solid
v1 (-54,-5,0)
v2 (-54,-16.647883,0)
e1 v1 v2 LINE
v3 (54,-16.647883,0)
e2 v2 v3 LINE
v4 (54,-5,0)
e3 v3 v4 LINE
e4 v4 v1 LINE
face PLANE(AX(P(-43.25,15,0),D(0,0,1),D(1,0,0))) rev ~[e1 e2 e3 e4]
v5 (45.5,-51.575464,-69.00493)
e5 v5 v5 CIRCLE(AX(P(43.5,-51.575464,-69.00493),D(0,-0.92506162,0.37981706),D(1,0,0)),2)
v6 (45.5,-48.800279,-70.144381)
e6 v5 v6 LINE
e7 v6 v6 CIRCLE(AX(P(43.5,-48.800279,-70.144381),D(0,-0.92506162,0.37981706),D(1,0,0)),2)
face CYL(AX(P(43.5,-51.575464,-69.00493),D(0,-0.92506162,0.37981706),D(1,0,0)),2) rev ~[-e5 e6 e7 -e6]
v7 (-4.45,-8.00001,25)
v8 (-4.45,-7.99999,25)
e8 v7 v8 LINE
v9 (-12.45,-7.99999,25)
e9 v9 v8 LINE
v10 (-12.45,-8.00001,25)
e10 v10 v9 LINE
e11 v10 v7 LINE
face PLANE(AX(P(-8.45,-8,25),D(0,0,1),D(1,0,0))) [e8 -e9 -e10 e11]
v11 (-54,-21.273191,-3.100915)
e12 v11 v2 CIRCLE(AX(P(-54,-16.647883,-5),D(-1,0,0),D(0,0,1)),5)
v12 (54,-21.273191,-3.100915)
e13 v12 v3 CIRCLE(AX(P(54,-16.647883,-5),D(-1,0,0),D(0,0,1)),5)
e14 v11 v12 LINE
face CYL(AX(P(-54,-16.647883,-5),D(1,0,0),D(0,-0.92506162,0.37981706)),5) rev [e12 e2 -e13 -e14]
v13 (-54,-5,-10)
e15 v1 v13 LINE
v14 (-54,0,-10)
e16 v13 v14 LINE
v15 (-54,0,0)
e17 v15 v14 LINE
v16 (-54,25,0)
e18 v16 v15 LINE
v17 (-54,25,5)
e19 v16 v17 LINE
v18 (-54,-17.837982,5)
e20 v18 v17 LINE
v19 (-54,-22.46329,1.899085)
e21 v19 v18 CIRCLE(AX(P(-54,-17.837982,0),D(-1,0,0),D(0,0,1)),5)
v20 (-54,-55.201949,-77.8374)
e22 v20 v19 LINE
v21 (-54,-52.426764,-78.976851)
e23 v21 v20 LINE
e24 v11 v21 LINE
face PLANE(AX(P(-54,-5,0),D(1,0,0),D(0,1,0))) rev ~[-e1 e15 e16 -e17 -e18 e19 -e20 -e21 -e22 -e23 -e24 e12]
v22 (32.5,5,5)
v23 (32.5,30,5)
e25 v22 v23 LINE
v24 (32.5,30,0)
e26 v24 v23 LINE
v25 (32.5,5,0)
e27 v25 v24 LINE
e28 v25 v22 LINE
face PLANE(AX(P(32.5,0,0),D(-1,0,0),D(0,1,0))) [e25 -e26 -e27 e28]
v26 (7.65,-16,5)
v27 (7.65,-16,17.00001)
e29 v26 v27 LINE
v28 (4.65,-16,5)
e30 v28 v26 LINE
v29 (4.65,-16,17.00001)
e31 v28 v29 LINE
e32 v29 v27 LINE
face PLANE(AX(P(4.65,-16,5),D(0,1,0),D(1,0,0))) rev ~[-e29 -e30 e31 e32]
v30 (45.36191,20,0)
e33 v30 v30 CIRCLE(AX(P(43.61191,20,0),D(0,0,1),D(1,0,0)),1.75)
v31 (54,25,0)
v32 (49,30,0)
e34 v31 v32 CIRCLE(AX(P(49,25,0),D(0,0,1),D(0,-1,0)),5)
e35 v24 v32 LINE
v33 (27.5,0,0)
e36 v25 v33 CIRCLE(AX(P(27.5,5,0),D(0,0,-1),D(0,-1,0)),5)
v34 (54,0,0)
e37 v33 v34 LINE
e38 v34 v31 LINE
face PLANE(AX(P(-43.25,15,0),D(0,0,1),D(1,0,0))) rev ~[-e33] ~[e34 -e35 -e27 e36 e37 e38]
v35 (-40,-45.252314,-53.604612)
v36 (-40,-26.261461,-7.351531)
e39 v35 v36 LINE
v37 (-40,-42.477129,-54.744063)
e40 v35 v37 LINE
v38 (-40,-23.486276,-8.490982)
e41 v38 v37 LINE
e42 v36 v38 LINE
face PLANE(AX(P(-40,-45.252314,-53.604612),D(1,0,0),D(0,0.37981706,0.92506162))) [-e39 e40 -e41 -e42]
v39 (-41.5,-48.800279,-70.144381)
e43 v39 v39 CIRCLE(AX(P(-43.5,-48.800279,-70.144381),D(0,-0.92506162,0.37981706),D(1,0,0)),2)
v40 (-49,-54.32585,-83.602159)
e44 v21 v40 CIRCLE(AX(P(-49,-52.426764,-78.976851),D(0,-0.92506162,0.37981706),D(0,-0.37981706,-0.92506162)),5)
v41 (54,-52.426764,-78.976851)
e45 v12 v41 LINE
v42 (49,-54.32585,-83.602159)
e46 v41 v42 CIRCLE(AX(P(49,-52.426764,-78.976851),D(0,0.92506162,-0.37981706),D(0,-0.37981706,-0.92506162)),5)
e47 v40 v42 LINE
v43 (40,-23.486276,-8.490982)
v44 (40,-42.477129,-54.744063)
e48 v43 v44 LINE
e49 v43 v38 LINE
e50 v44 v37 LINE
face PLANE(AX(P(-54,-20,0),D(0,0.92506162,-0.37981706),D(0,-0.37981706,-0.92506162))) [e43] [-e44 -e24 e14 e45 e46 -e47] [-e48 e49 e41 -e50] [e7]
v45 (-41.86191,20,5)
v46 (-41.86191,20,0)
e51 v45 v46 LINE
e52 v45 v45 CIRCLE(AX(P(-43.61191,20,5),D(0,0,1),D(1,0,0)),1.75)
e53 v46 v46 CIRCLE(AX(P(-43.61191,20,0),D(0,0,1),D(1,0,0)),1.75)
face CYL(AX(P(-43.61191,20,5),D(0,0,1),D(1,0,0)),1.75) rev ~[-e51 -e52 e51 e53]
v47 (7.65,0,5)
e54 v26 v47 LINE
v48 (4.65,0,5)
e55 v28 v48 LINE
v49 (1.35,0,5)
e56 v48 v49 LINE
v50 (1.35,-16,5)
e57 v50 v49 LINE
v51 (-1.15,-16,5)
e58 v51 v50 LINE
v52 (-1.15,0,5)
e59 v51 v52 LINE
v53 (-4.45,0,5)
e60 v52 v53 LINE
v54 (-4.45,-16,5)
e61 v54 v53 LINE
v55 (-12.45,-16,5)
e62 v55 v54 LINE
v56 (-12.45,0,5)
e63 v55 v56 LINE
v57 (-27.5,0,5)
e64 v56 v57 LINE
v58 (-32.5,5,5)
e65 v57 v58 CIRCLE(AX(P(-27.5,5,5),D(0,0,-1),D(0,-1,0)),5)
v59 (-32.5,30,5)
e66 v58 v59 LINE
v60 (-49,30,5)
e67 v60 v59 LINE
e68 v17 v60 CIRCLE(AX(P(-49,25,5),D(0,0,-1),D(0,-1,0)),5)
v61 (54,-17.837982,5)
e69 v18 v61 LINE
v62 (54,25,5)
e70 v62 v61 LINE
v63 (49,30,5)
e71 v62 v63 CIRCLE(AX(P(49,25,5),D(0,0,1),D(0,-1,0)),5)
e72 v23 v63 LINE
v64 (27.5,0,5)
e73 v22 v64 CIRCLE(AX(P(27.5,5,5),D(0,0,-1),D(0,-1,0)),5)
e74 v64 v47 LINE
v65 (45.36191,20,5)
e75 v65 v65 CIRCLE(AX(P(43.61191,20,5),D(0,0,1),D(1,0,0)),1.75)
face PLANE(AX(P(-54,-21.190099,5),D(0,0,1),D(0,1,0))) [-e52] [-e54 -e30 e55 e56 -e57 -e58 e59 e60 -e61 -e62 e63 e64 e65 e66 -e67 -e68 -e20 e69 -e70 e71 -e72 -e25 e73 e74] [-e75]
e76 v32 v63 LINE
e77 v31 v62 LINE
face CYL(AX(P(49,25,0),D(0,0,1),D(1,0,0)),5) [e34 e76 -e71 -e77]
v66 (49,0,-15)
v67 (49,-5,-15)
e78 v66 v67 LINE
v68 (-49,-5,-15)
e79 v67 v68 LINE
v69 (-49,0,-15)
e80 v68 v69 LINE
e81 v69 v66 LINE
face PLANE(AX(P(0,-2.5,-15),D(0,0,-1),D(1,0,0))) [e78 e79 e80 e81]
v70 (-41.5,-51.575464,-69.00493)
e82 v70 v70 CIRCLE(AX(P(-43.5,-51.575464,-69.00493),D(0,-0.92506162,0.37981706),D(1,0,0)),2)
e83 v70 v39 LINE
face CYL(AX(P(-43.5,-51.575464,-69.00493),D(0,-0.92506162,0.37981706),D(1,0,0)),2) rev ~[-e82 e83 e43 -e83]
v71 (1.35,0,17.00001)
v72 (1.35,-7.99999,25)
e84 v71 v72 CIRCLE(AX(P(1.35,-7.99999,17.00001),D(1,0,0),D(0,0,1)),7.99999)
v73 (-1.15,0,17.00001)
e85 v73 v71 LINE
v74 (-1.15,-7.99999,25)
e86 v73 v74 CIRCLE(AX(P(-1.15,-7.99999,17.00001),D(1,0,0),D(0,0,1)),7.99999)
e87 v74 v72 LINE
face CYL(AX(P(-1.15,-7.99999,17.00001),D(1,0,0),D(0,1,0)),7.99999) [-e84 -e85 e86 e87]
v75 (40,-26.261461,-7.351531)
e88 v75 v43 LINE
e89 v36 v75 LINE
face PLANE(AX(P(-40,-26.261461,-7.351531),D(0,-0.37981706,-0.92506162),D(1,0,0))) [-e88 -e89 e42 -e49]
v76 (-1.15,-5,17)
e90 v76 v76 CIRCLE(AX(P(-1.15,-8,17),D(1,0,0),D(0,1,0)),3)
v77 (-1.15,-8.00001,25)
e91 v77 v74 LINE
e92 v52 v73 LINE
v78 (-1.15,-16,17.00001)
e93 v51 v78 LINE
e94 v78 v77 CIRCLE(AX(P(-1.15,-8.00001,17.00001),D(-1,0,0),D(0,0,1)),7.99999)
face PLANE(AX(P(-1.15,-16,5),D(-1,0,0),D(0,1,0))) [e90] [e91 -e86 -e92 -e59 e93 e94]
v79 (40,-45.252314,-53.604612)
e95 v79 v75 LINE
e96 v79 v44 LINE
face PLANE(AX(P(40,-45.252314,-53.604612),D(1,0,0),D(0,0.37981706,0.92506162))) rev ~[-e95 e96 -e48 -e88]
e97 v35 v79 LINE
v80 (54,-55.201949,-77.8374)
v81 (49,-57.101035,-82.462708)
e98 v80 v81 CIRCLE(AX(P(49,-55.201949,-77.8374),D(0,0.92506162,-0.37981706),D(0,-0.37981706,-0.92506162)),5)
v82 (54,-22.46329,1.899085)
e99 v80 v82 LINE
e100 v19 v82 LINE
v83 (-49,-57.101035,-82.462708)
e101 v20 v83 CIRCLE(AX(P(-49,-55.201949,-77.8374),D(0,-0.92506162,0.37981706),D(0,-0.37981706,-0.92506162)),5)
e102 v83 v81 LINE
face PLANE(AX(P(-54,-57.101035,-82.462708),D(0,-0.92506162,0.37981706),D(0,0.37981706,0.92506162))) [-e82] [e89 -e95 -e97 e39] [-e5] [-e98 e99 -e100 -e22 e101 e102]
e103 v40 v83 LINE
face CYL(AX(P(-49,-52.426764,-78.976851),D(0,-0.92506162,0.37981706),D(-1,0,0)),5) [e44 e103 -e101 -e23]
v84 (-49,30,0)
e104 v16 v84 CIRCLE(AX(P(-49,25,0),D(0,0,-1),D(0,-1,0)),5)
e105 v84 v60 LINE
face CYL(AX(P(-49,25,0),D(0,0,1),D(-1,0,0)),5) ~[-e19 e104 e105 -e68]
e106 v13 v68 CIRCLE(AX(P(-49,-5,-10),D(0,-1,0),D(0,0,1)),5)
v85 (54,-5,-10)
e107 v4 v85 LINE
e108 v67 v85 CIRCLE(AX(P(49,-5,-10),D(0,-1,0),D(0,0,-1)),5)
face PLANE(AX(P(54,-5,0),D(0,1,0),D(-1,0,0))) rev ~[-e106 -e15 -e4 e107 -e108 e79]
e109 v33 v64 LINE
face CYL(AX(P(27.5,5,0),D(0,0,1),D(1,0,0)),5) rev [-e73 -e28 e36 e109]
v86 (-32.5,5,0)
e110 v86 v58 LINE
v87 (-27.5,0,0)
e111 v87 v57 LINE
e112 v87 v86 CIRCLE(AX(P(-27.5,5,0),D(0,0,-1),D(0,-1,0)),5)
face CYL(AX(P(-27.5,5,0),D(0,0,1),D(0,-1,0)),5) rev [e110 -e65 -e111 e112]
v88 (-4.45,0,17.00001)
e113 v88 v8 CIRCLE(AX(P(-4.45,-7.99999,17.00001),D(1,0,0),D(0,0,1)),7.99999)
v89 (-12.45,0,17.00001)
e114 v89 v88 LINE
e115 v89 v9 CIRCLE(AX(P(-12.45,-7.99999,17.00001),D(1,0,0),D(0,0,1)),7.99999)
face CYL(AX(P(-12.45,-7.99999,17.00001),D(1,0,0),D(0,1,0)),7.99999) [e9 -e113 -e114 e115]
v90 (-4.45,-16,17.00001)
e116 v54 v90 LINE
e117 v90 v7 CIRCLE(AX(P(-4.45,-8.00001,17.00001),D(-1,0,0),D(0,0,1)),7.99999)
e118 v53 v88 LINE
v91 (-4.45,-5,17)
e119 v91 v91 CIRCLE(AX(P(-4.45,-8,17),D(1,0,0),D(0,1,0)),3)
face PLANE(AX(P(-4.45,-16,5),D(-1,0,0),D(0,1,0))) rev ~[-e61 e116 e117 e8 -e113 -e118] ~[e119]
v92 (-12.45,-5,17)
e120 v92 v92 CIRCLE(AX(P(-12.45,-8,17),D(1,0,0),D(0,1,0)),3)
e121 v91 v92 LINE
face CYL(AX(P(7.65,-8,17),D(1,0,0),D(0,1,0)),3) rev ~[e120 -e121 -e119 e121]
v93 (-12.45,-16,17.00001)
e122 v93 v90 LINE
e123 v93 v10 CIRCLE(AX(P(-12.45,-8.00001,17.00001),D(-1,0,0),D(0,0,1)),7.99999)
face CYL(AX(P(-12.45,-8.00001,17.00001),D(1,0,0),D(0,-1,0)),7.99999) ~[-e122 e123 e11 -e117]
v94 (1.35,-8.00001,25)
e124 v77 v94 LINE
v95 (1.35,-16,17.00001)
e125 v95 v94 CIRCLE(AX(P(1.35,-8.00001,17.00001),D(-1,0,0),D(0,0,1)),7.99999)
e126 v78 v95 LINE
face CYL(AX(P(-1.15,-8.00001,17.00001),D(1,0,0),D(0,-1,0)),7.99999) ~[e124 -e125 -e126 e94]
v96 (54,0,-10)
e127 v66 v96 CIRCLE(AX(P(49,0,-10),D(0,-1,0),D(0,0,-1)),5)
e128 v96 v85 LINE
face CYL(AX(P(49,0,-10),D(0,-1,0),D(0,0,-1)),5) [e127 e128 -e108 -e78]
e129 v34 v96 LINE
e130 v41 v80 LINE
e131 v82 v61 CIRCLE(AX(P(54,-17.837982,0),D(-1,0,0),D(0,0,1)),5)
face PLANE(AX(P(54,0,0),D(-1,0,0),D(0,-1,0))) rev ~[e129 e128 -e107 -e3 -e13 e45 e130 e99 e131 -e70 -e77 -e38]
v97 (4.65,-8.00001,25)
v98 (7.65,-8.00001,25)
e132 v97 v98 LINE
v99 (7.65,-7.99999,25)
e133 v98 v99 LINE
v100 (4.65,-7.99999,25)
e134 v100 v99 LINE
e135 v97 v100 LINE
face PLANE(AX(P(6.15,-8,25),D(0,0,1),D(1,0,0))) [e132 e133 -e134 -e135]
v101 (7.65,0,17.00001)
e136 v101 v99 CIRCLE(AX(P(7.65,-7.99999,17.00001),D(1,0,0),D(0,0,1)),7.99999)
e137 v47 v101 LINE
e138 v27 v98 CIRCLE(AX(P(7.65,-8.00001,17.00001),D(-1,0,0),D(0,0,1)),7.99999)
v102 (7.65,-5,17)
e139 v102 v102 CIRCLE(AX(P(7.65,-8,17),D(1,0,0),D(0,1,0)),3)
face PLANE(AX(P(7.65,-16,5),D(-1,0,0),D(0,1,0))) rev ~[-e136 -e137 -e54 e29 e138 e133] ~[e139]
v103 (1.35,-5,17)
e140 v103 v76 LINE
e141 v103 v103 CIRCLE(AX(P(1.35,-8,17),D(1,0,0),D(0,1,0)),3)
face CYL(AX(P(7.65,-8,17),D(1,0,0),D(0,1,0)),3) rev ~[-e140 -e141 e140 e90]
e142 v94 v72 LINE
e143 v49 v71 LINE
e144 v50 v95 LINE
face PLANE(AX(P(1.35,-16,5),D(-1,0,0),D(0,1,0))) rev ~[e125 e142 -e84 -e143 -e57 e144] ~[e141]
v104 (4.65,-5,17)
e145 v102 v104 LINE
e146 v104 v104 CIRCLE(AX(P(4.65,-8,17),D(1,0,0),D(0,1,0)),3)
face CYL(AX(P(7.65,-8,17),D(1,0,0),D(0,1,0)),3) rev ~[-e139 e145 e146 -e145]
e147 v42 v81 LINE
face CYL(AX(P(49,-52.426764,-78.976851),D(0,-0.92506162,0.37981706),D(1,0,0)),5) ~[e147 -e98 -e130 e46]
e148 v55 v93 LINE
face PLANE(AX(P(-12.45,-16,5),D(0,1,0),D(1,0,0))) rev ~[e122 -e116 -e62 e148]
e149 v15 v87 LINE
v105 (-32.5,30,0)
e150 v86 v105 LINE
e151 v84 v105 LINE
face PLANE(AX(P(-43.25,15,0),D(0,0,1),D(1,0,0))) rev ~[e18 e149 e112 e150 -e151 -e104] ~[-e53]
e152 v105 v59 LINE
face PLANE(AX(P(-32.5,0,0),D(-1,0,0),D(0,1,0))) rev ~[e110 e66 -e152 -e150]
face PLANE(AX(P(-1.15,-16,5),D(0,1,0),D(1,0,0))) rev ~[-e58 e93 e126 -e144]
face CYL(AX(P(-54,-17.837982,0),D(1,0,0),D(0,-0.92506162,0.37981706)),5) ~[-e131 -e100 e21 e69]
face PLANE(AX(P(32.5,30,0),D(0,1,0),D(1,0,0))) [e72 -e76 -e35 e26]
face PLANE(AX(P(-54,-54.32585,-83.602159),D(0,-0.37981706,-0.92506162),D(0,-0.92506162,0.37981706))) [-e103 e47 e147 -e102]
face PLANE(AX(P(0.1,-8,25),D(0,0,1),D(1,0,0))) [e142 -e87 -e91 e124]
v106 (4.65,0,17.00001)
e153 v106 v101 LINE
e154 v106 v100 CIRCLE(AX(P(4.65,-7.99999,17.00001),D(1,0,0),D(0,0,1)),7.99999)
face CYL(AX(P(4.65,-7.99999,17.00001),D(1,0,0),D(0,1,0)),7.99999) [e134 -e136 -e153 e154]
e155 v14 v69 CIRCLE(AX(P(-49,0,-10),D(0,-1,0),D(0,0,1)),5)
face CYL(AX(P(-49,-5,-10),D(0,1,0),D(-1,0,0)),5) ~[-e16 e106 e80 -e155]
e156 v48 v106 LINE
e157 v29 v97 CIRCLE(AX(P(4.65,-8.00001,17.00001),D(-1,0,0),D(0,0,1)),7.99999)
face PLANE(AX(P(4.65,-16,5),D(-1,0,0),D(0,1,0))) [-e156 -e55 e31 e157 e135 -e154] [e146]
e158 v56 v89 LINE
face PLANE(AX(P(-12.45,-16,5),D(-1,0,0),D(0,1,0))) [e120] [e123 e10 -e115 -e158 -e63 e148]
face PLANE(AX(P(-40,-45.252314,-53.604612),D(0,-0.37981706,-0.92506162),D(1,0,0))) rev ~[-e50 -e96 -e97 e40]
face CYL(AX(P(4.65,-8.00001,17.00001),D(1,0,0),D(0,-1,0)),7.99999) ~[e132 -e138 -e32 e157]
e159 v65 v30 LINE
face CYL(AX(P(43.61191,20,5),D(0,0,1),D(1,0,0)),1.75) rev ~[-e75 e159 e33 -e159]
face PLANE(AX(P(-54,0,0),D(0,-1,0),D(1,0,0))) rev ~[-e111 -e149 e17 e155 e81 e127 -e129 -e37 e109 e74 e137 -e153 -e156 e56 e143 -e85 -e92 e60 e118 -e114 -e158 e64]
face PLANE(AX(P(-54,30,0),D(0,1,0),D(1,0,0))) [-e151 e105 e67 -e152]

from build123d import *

# Parameters (mm, degrees)
F0_W      = 21.5
F0_H      = 30
F1_DEPTH  = 5
F3_DEPTH  = 108
F4_R      = 2
F5_DEPTH  = 25
F7_R      = 5
F6_W      = 8
F6_H      = 16
F6_W_2    = 2.5
F6_W_3    = 3
F8_DEPTH  = 20
F9_R      = 7.99999
F10_R     = 3
F11_DEPTH = 40
F12_W     = 80
F12_H     = 50
F13_DEPTH = 25
F15_DEPTH = 15
F16_R     = 5
F17_R     = 1.75
F18_DEPTH = 25


# Not quite as in the source:
# - a fillet or chamfer is up to 0.001 mm smaller than in the source, because OpenCascade refuses the exact size


with BuildPart() as f1:
    # F0 (on Top) → F1 (new body)
    with BuildSketch(Plane.XY):
        with Locations((-43.25, 15)):
            Rectangle(F0_W, F0_H)
        Polygon((-32.5, 0), (-54, 0), (-54, -20), (54, -20), (54, 0), (32.5, 0), align=None)
        with Locations((43.25, 15)):
            Rectangle(F0_W, F0_H)
    extrude(amount=F1_DEPTH)

    # F2 (on face) → F3 (join)
    with BuildSketch(Plane(origin=(-54, 0, 0), x_dir=(0, -1, 0), z_dir=(-1, 0, 0))):
        Polygon((20, 5), (20, 0), (54.3258497444, -83.6021589144), (57.101034605, -82.4627077355), (21.1900987758, 5), align=None)
    extrude(amount=-F3_DEPTH)

    # F4 (on face) → F5 (cut)
    with BuildSketch(Plane(origin=(0, -19.8899648845, 8.1665348708), x_dir=(1, 0, 0), z_dir=(0, -0.9250616202, 0.3798170597))):
        with Locations((-43.5, -83.4230529098)):
            Circle(F4_R)
        with Locations((43.5, -83.4230529098)):
            Circle(F4_R)
    extrude(amount=-F5_DEPTH, mode=Mode.SUBTRACT)

    # F7
    f7_edges = [f1.edges().sort_by_distance(p)[0] for p in [
        (0, -21.190099, 5),
        (0, -20, 0),
        (-54, 30, 2.5),
        (54, 30, 2.5),
        (54, -55.713442, -83.032433),
        (-54, -55.713442, -83.032433),
        (-32.5, 0, 2.5),
        (32.5, 0, 2.5),
    ]]
    fillet(f7_edges, radius=F7_R)

    # F6 (on face) → F8 (join)
    with BuildSketch(Plane.XY.offset(5)):
        with Locations((-8.45, -8)):
            Rectangle(F6_W, F6_H)
        with Locations((0.1, -8)):
            Rectangle(F6_W_2, F6_H)
        with Locations((6.15, -8)):
            Rectangle(F6_W_3, F6_H)
    extrude(amount=F8_DEPTH)

    # F9 (radius 8 in the source; OpenCascade refuses exactly that, so slightly less here)
    f9_edges = [f1.edges().sort_by_distance(p)[0] for p in [
        (-8.45, -16, 25),
        (0.1, -16, 25),
        (6.15, -16, 25),
        (-8.45, 0, 25),
        (0.1, 0, 25),
        (6.15, 0, 25),
    ]]
    fillet(f9_edges, radius=F9_R)

    # F10 (on face) → F11 (cut)
    with BuildSketch(Plane.YZ.offset(7.65)):
        with Locations((-8, 17)):
            Circle(F10_R)
    extrude(amount=-F11_DEPTH, mode=Mode.SUBTRACT)

    # F12 (on face) → F13 (cut)
    with BuildSketch(Plane(origin=(0, -19.8899648845, 8.1665348708), x_dir=(1, 0, 0), z_dir=(0, -0.9250616202, 0.3798170597))):
        with Locations((0, -41.7751698217)):
            Rectangle(F12_W, F12_H)
    extrude(amount=-F13_DEPTH, mode=Mode.SUBTRACT)

    # F14 (on face) → F15 (join)
    with BuildSketch(Plane(origin=(0, 0, 0), x_dir=(1, 0, 0), z_dir=(0, 0, -1))):
        Polygon((-54, 5), (-54, 0), (-27.5, 0), (27.5, 0), (54, 0), (54, 5), align=None)
    extrude(amount=F15_DEPTH)

    # F16
    f16_edges = [f1.edges().sort_by_distance(p)[0] for p in [
        (54, -2.5, -15),
        (-54, -2.5, -15),
    ]]
    fillet(f16_edges, radius=F16_R)

    # F17 (on face) → F18 (cut)
    with BuildSketch(Plane.XY.offset(5)):
        with Locations((-43.6119101942, 20)):
            Circle(F17_R)
        with Locations((43.6119101942, 20)):
            Circle(F17_R)
    extrude(amount=-F18_DEPTH, mode=Mode.SUBTRACT)


solid = f1.part
